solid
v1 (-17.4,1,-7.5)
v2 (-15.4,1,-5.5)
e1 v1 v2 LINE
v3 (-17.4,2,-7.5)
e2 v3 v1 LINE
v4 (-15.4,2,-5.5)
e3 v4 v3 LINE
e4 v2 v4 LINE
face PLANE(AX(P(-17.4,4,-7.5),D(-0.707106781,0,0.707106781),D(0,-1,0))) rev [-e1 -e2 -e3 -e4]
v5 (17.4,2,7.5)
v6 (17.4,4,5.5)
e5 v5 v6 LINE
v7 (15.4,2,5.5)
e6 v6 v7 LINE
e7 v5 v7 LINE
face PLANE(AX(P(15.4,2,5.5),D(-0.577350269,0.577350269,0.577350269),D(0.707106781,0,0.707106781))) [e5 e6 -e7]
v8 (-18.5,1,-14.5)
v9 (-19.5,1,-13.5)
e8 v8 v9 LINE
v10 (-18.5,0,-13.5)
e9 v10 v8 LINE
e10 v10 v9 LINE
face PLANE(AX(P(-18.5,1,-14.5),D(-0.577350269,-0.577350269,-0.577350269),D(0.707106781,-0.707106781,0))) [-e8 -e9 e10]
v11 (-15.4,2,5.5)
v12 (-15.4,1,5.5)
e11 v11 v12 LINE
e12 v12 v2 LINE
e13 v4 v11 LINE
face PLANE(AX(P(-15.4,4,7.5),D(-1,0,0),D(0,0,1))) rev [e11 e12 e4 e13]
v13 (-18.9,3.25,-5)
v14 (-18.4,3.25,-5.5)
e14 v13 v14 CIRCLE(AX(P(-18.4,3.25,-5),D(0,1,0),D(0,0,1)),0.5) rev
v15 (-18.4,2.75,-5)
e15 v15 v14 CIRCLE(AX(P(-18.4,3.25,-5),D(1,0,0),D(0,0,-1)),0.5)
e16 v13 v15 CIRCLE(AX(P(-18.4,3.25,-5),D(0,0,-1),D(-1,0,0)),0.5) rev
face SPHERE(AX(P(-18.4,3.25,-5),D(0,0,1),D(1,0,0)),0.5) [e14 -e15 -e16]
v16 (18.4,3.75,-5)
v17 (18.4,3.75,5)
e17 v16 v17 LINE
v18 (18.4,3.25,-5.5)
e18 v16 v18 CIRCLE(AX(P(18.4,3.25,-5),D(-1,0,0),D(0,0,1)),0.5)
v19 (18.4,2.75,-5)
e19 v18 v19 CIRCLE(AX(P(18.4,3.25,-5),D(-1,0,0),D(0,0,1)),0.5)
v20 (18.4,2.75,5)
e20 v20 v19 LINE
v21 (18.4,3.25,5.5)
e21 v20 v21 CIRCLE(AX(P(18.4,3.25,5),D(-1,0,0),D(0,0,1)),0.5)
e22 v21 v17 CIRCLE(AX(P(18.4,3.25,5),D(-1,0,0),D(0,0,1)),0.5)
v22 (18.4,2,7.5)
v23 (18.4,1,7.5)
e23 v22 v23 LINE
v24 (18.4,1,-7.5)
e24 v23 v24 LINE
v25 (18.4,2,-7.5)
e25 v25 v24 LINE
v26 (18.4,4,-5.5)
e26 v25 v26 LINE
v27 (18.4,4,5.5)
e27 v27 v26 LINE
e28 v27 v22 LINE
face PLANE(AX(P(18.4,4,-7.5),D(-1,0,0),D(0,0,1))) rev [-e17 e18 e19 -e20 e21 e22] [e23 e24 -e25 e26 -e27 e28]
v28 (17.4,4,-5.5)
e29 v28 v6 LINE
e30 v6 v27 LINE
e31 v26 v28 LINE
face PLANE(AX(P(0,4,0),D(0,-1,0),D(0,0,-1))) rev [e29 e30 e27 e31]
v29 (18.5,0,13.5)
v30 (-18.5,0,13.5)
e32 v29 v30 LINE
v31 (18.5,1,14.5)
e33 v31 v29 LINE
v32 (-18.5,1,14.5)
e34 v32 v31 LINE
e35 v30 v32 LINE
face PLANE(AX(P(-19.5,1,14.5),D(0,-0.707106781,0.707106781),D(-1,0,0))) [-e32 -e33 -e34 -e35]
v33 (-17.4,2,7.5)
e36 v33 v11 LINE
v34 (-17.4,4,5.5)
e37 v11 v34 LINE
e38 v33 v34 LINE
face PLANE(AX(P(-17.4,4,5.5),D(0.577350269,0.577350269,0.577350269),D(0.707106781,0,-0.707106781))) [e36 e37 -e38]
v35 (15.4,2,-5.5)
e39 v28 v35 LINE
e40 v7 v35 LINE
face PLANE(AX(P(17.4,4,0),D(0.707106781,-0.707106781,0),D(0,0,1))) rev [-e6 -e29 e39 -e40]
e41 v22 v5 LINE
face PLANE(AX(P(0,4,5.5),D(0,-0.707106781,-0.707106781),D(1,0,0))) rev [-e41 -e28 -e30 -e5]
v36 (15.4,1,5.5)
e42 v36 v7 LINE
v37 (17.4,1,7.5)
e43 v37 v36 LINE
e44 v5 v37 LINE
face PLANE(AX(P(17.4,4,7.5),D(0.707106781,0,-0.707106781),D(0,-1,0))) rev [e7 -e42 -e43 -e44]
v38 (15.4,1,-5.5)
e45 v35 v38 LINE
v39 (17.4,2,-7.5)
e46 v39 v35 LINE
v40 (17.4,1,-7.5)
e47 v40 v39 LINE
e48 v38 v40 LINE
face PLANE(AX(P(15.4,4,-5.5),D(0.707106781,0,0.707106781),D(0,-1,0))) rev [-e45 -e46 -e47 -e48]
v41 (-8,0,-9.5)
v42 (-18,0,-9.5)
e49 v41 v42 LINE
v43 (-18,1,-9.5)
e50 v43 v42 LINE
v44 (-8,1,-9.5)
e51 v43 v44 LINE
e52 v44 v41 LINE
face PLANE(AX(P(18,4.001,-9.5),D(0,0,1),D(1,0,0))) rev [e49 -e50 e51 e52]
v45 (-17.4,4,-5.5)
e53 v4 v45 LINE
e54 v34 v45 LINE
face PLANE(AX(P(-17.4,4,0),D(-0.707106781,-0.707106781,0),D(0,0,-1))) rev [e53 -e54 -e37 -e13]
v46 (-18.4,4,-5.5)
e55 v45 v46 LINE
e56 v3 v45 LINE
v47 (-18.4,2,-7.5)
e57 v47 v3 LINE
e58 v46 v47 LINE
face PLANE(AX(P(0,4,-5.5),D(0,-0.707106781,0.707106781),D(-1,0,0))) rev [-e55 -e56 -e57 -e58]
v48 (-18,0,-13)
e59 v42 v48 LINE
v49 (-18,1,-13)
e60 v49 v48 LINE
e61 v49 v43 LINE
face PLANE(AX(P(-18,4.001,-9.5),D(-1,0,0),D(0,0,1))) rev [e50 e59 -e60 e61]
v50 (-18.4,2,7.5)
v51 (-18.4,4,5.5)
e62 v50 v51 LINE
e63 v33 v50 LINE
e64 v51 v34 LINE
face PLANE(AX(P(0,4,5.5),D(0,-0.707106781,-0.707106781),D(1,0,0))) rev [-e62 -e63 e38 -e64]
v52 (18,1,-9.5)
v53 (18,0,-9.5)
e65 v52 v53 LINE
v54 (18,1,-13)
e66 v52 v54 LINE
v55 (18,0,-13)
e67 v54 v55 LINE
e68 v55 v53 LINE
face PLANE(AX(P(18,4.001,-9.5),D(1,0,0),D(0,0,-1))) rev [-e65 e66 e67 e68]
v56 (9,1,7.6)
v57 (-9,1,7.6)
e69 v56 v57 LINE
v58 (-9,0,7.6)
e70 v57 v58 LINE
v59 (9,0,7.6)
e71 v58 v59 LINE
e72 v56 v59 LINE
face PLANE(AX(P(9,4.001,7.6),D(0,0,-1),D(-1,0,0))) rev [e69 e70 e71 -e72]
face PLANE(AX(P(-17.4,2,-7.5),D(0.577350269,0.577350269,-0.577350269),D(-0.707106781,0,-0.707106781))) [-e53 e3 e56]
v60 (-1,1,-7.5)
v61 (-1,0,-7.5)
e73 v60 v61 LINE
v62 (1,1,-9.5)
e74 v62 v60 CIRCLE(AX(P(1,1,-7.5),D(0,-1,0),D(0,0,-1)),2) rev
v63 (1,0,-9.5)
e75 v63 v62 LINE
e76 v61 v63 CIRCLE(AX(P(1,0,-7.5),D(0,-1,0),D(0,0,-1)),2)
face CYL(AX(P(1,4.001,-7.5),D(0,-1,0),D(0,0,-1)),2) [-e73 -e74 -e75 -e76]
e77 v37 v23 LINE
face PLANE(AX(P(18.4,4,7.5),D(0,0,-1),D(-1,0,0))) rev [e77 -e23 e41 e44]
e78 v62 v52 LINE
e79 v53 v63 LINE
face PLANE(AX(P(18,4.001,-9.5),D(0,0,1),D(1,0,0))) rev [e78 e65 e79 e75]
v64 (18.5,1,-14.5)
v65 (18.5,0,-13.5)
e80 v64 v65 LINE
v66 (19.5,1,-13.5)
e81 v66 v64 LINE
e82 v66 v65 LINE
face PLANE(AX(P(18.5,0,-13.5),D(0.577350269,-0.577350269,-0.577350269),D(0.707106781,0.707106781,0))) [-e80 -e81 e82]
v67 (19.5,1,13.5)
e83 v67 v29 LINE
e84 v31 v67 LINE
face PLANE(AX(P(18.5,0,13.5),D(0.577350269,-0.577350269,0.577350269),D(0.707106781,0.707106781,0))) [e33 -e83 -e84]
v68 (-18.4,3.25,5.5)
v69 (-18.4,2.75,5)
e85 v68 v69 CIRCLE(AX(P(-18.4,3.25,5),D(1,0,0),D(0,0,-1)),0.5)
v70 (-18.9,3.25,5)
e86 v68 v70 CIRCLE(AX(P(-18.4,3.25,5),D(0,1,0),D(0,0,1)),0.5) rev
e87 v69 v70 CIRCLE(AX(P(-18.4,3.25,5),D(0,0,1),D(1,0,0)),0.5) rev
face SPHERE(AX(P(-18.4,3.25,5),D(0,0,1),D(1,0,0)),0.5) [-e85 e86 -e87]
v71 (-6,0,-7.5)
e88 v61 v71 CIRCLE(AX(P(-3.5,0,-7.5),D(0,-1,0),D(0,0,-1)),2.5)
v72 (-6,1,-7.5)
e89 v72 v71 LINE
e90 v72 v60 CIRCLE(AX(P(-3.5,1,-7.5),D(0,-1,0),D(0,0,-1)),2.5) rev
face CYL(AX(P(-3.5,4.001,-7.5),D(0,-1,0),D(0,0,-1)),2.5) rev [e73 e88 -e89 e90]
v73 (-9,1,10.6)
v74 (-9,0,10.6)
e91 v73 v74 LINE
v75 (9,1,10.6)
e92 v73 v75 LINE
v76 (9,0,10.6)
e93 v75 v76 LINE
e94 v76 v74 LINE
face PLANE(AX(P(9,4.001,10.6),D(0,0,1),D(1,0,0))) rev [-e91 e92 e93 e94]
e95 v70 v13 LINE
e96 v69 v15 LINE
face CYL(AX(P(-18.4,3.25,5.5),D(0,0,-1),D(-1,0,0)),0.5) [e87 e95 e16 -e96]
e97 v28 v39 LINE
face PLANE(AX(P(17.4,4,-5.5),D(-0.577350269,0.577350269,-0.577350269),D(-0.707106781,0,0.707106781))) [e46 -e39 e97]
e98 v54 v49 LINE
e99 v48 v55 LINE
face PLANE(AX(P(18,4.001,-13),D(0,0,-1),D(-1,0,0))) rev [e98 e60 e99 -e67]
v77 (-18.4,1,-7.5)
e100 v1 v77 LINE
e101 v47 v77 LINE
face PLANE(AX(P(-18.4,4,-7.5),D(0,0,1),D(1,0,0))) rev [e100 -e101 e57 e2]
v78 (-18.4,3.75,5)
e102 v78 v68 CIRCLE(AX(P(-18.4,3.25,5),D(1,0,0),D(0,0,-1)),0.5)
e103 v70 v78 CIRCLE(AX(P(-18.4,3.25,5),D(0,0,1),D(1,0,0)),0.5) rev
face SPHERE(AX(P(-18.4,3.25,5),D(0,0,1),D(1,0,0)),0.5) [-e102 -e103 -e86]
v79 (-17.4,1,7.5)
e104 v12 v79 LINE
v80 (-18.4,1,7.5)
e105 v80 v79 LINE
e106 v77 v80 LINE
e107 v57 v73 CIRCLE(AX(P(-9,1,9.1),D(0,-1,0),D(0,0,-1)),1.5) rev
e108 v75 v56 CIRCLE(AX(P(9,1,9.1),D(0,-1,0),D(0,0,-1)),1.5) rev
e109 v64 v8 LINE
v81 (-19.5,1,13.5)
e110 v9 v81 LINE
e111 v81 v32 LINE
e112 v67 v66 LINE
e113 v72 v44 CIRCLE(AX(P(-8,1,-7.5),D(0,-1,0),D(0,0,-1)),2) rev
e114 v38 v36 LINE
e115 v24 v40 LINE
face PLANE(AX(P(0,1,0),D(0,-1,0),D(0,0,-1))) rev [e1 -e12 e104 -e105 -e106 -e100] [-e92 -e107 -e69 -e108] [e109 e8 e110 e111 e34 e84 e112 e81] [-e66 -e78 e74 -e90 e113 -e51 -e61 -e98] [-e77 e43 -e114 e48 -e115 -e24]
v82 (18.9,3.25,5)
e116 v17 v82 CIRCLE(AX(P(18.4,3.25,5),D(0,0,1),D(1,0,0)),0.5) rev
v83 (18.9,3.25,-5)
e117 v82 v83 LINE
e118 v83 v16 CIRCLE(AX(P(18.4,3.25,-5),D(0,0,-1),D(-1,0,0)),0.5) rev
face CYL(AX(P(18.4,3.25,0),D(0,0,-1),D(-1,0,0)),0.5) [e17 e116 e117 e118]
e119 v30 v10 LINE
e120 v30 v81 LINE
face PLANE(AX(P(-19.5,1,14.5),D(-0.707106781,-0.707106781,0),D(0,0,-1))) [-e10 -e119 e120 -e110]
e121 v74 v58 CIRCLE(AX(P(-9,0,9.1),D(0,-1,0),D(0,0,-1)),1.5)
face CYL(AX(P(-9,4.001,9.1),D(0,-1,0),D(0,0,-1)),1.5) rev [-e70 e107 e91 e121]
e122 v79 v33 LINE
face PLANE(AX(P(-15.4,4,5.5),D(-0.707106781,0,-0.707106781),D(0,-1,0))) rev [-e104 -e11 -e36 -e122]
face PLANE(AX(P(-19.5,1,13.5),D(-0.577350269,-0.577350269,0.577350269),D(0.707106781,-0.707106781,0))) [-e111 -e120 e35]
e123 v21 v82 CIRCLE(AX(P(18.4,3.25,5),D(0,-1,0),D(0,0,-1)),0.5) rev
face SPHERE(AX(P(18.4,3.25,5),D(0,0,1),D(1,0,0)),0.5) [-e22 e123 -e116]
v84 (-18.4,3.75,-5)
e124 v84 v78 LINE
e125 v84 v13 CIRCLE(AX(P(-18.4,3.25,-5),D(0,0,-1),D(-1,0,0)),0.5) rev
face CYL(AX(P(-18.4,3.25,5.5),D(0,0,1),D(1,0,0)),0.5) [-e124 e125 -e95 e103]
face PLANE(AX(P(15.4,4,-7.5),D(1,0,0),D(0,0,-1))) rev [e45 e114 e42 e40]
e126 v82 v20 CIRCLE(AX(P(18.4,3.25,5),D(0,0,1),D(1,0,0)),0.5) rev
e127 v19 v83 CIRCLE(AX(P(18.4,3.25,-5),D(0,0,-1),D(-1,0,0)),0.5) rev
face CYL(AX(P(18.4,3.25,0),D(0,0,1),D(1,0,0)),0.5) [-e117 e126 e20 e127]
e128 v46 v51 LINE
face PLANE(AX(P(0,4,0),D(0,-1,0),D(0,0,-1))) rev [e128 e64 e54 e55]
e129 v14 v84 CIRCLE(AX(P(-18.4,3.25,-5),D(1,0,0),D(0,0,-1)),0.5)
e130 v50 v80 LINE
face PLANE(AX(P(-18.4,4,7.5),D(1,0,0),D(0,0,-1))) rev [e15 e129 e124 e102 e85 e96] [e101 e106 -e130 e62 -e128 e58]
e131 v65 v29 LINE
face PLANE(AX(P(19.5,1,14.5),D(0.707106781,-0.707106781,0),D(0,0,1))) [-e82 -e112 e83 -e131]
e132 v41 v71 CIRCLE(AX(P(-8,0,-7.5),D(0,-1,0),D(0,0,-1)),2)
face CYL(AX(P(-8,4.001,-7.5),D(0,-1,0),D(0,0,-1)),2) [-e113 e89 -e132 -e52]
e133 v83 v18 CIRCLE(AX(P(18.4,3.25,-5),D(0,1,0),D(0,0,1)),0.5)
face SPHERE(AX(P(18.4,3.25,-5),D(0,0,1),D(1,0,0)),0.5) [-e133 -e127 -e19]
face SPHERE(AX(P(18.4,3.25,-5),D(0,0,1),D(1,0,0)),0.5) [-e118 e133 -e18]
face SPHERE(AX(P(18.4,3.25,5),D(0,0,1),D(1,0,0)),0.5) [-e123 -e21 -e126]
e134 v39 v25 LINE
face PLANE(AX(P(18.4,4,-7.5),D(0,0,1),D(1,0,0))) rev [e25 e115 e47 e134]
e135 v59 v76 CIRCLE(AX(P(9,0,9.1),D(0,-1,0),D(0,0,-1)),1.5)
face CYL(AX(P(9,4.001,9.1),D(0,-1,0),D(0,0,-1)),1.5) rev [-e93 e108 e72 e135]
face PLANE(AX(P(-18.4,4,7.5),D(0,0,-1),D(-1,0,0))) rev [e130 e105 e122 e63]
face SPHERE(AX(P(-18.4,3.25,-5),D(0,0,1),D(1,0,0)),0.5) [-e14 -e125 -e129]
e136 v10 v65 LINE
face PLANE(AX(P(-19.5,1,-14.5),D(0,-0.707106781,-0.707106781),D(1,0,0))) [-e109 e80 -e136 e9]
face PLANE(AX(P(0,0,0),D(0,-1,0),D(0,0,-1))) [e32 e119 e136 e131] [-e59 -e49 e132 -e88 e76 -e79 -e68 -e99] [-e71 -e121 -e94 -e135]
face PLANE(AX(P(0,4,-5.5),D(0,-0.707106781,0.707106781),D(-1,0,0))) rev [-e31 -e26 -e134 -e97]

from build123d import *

# Parameters (mm, degrees)
SKETCH1_W           = 39
SKETCH1_H           = 29
BOSS_EXTRUDE1_DEPTH = 1
SKETCH2_W           = 3
SKETCH2_H           = 15
BOSS_EXTRUDE2_DEPTH = 3
CHAMFER1_SIZE       = 1
CHAMFER2_SIZE       = 2
SKETCH3_W           = 11
SKETCH3_H           = 1
BOSS_EXTRUDE3_DEPTH = 0.5
FILLET1_R           = 0.5
CUT_EXTRUDE1_REACH  = 26.627
CUT_EXTRUDE2_REACH  = 26.627
SKETCH5_W           = 36
SKETCH5_H           = 3.5
CUT_EXTRUDE3_REACH  = 26.627
FILLET2_R           = 2


# Read off the part's stored shape, not the designer's step: Mirror1
# Some blends are built 0.0001 mm under size
with BuildPart() as part:
    # Sketch1 → Boss-Extrude1 (new body)
    with BuildSketch(Plane(origin=(0, 0, 0), x_dir=(1, 0, 0), z_dir=(0, 1, 0))):
        Rectangle(SKETCH1_W, SKETCH1_H)
    extrude(amount=BOSS_EXTRUDE1_DEPTH)

    # Sketch2 → Boss-Extrude2 (add)
    with BuildSketch(Plane(origin=(0, 1, 0), x_dir=(1, 0, 0), z_dir=(0, 1, 0))):
        with Locations((-16.9, 0)):
            Rectangle(SKETCH2_W, SKETCH2_H)
        with Locations((16.9, 0)):
            Rectangle(SKETCH2_W, SKETCH2_H)
    extrude(amount=BOSS_EXTRUDE2_DEPTH)

    # Chamfer1
    chamfer1_edges = [part.edges().sort_by_distance(p)[0] for p in [
        (0, 0, 14.5),
        (-19.5, 0, 0),
        (0, 0, -14.5),
        (19.5, 0, 0),
        (19.5, 0.5, 14.5),
        (-19.5, 0.5, 14.5),
        (-19.5, 0.5, -14.5),
        (19.5, 0.5, -14.5),
    ]]
    chamfer(chamfer1_edges, length=CHAMFER1_SIZE - 0.0001)  # a hair under: the kernel refuses the full size

    # Chamfer2
    chamfer2_edges = [part.edges().sort_by_distance(p)[0] for p in [
        (-15.4, 2.5, 7.5),
        (-15.4, 2.5, -7.5),
        (-16.9, 4, 7.5),
        (-15.4, 4, 0),
        (-16.9, 4, -7.5),
        (15.4, 2.5, -7.5),
        (15.4, 2.5, 7.5),
        (16.9, 4, -7.5),
        (15.4, 4, 0),
        (16.9, 4, 7.5),
    ]]
    chamfer(chamfer2_edges, length=CHAMFER2_SIZE)

    # Sketch3 → Boss-Extrude3 (add)
    with BuildSketch(Plane(origin=(18.4, 0, 0), x_dir=(0, 0, -1), z_dir=(1, 0, 0))):
        with Locations((0, 3.25)):
            Rectangle(SKETCH3_W, SKETCH3_H)
    extrude(amount=BOSS_EXTRUDE3_DEPTH)

    # Fillet1
    # the kernel refuses this fillet: 0.5 mm, written as the material it adds along each edge
    # the kernel refuses this fillet: 0.5 mm, written as the material it takes off along each edge
    with BuildSketch(Plane(origin=(18.4, 3.25, 5), x_dir=(1, 0, 0), z_dir=(0, 0, 1))) as fillet1_2_piece_1_section:
        Polygon((0, 0), (FILLET1_R * 1.02, 0), (FILLET1_R * 1.02, FILLET1_R * 1.02), (0, FILLET1_R * 1.02), align=None)
    fillet1_2_piece_1 = extrude(amount=FILLET1_R * 1.02, mode=Mode.PRIVATE)
    fillet1_2_piece_1 = fillet1_2_piece_1 - Plane(origin=(18.4, 3.25, 5), x_dir=(-0.7071067811865475, -0.7071067811865475, 0), z_dir=(0, 0, 1)) * Sphere(FILLET1_R, mode=Mode.PRIVATE)
    with BuildSketch(Plane(origin=(18.4, 3.25, 5), x_dir=(0, 0, 1), z_dir=(0, -1, 0))) as fillet1_2_piece_2_section:
        Polygon((0, 0), (FILLET1_R * 1.02, 0), (FILLET1_R * 1.02, -FILLET1_R * 1.02), (0, -FILLET1_R * 1.02), align=None)
    fillet1_2_piece_2 = extrude(amount=FILLET1_R * 1.02, mode=Mode.PRIVATE)
    fillet1_2_piece_2 = fillet1_2_piece_2 - Plane(origin=(18.4, 3.25, 5), x_dir=(-0.7071067811865475, 0, -0.7071067811865475), z_dir=(0, -1, 0)) * Sphere(FILLET1_R, mode=Mode.PRIVATE)
    with BuildSketch(Plane(origin=(18.4, 3.25, -5), x_dir=(0, -1, 0), z_dir=(0, 0, -1))) as fillet1_2_piece_3_section:
        Polygon((0, 0), (FILLET1_R * 1.02, 0), (FILLET1_R * 1.02, -FILLET1_R * 1.02), (0, -FILLET1_R * 1.02), align=None)
    fillet1_2_piece_3 = extrude(amount=FILLET1_R * 1.02, mode=Mode.PRIVATE)
    fillet1_2_piece_3 = fillet1_2_piece_3 - Plane(origin=(18.4, 3.25, -5), x_dir=(-0.7071067811865475, 0.7071067811865475, 0), z_dir=(0, 0, -1)) * Sphere(FILLET1_R, mode=Mode.PRIVATE)
    with BuildSketch(Plane(origin=(18.4, 3.25, -5), x_dir=(1, 0, 0), z_dir=(0, 0, -1))) as fillet1_2_piece_4_section:
        Polygon((0, 0), (FILLET1_R * 1.02, 0), (FILLET1_R * 1.02, -FILLET1_R * 1.02), (0, -FILLET1_R * 1.02), align=None)
    fillet1_2_piece_4 = extrude(amount=FILLET1_R * 1.02, mode=Mode.PRIVATE)
    fillet1_2_piece_4 = fillet1_2_piece_4 - Plane(origin=(18.4, 3.25, -5), x_dir=(-0.7071067811865475, -0.7071067811865475, 0), z_dir=(0, 0, -1)) * Sphere(FILLET1_R, mode=Mode.PRIVATE)
    with BuildSketch(Plane(origin=(18.9, 2.75, -5), x_dir=(-1, 0, 0), z_dir=(0, 0, 1)), Plane(origin=(18.9, 3.75, 5), x_dir=(-1, 0, 0), z_dir=(0, 0, -1))) as fillet1_2_piece_5:
        with BuildLine():
            CenterArc((FILLET1_R, -FILLET1_R), FILLET1_R, 90, 90)
            Line((0, -FILLET1_R), (0, 0))
            Line((0, 0), (FILLET1_R, 0))
        make_face()
    fillet1_2_piece_5_solid = extrude(amount=10, mode=Mode.PRIVATE)
    add([fillet1_2_piece_1, fillet1_2_piece_2, fillet1_2_piece_3, fillet1_2_piece_4, fillet1_2_piece_5_solid], mode=Mode.SUBTRACT)

    # Mirror1 outline → Mirror1 (revolve)
    with BuildSketch(Plane(origin=(-18.4, 3.25, 0), x_dir=(1, 0, 0), z_dir=(0, -1, 0))):
        with BuildLine():
            Line((0, 5.5), (0, -5.5))
            ThreePointArc((0, -5.5), (0.353553391, -5.353553391), (0.5, -5))
            Line((0.5, -5), (0.5, 5))
            ThreePointArc((0.5, 5), (0.353553391, 5.353553391), (0, 5.5))
        make_face()
    revolve(axis=Axis((-18.4, 3.25, 0), (0, 0, 1)))

    # Sketch4 → Cut-Extrude1 (cut, up to next)
    with BuildSketch(Plane.XZ, mode=Mode.PRIVATE) as cut_extrude1_sk1:
        with BuildLine():
            Line((9, 7.6), (-9, 7.6))
            ThreePointArc((-9, 7.6), (-10.5, 9.1), (-9, 10.6))
            Line((-9, 10.6), (9, 10.6))
            ThreePointArc((9, 10.6), (10.5, 9.1), (9, 7.6))
        make_face()
    cut_extrude1_tool1 = extrude(cut_extrude1_sk1.sketch, amount=-CUT_EXTRUDE1_REACH, mode=Mode.PRIVATE) & part.part
    add(cut_extrude1_tool1.solids().sort_by_distance((0, 0, 9.1))[0], mode=Mode.SUBTRACT)

    # Sketch5 → Cut-Extrude2 (cut, up to next)
    with BuildSketch(Plane(origin=(0, 0, 0), x_dir=(-1, 0, 0), z_dir=(0, -1, 0)), mode=Mode.PRIVATE) as cut_extrude2_sk1:
        with Locations((0, 11.25)):
            Rectangle(SKETCH5_W, SKETCH5_H)
    cut_extrude2_tool1 = extrude(cut_extrude2_sk1.sketch, amount=-CUT_EXTRUDE2_REACH, mode=Mode.PRIVATE) & part.part
    add(cut_extrude2_tool1.solids().sort_by_distance((0, 0, -11.25))[0], mode=Mode.SUBTRACT)

    # Sketch6 → Cut-Extrude3 (cut, up to next)
    with BuildSketch(Plane.XZ, mode=Mode.PRIVATE) as cut_extrude3_sk1:
        with BuildLine():
            Line((-6, -7.5), (-6, -9.5))
            Line((-6, -9.5), (-1, -9.5))
            Line((-1, -9.5), (-1, -7.5))
            ThreePointArc((-1, -7.5), (-3.5, -5), (-6, -7.5))
        make_face()
    cut_extrude3_tool1 = extrude(cut_extrude3_sk1.sketch, amount=-CUT_EXTRUDE3_REACH, mode=Mode.PRIVATE) & part.part
    add(cut_extrude3_tool1.solids().sort_by_distance((-3.5, 0, -7.478975))[0], mode=Mode.SUBTRACT)

    # Fillet2
    fillet2_edges = [part.edges().sort_by_distance(p)[0] for p in [
        (-6, 0.5, -9.5),
        (-1, 0.5, -9.5),
    ]]
    fillet(fillet2_edges, radius=FILLET2_R - 0.0001)  # a hair under: the kernel refuses the full size


solid = part.part
